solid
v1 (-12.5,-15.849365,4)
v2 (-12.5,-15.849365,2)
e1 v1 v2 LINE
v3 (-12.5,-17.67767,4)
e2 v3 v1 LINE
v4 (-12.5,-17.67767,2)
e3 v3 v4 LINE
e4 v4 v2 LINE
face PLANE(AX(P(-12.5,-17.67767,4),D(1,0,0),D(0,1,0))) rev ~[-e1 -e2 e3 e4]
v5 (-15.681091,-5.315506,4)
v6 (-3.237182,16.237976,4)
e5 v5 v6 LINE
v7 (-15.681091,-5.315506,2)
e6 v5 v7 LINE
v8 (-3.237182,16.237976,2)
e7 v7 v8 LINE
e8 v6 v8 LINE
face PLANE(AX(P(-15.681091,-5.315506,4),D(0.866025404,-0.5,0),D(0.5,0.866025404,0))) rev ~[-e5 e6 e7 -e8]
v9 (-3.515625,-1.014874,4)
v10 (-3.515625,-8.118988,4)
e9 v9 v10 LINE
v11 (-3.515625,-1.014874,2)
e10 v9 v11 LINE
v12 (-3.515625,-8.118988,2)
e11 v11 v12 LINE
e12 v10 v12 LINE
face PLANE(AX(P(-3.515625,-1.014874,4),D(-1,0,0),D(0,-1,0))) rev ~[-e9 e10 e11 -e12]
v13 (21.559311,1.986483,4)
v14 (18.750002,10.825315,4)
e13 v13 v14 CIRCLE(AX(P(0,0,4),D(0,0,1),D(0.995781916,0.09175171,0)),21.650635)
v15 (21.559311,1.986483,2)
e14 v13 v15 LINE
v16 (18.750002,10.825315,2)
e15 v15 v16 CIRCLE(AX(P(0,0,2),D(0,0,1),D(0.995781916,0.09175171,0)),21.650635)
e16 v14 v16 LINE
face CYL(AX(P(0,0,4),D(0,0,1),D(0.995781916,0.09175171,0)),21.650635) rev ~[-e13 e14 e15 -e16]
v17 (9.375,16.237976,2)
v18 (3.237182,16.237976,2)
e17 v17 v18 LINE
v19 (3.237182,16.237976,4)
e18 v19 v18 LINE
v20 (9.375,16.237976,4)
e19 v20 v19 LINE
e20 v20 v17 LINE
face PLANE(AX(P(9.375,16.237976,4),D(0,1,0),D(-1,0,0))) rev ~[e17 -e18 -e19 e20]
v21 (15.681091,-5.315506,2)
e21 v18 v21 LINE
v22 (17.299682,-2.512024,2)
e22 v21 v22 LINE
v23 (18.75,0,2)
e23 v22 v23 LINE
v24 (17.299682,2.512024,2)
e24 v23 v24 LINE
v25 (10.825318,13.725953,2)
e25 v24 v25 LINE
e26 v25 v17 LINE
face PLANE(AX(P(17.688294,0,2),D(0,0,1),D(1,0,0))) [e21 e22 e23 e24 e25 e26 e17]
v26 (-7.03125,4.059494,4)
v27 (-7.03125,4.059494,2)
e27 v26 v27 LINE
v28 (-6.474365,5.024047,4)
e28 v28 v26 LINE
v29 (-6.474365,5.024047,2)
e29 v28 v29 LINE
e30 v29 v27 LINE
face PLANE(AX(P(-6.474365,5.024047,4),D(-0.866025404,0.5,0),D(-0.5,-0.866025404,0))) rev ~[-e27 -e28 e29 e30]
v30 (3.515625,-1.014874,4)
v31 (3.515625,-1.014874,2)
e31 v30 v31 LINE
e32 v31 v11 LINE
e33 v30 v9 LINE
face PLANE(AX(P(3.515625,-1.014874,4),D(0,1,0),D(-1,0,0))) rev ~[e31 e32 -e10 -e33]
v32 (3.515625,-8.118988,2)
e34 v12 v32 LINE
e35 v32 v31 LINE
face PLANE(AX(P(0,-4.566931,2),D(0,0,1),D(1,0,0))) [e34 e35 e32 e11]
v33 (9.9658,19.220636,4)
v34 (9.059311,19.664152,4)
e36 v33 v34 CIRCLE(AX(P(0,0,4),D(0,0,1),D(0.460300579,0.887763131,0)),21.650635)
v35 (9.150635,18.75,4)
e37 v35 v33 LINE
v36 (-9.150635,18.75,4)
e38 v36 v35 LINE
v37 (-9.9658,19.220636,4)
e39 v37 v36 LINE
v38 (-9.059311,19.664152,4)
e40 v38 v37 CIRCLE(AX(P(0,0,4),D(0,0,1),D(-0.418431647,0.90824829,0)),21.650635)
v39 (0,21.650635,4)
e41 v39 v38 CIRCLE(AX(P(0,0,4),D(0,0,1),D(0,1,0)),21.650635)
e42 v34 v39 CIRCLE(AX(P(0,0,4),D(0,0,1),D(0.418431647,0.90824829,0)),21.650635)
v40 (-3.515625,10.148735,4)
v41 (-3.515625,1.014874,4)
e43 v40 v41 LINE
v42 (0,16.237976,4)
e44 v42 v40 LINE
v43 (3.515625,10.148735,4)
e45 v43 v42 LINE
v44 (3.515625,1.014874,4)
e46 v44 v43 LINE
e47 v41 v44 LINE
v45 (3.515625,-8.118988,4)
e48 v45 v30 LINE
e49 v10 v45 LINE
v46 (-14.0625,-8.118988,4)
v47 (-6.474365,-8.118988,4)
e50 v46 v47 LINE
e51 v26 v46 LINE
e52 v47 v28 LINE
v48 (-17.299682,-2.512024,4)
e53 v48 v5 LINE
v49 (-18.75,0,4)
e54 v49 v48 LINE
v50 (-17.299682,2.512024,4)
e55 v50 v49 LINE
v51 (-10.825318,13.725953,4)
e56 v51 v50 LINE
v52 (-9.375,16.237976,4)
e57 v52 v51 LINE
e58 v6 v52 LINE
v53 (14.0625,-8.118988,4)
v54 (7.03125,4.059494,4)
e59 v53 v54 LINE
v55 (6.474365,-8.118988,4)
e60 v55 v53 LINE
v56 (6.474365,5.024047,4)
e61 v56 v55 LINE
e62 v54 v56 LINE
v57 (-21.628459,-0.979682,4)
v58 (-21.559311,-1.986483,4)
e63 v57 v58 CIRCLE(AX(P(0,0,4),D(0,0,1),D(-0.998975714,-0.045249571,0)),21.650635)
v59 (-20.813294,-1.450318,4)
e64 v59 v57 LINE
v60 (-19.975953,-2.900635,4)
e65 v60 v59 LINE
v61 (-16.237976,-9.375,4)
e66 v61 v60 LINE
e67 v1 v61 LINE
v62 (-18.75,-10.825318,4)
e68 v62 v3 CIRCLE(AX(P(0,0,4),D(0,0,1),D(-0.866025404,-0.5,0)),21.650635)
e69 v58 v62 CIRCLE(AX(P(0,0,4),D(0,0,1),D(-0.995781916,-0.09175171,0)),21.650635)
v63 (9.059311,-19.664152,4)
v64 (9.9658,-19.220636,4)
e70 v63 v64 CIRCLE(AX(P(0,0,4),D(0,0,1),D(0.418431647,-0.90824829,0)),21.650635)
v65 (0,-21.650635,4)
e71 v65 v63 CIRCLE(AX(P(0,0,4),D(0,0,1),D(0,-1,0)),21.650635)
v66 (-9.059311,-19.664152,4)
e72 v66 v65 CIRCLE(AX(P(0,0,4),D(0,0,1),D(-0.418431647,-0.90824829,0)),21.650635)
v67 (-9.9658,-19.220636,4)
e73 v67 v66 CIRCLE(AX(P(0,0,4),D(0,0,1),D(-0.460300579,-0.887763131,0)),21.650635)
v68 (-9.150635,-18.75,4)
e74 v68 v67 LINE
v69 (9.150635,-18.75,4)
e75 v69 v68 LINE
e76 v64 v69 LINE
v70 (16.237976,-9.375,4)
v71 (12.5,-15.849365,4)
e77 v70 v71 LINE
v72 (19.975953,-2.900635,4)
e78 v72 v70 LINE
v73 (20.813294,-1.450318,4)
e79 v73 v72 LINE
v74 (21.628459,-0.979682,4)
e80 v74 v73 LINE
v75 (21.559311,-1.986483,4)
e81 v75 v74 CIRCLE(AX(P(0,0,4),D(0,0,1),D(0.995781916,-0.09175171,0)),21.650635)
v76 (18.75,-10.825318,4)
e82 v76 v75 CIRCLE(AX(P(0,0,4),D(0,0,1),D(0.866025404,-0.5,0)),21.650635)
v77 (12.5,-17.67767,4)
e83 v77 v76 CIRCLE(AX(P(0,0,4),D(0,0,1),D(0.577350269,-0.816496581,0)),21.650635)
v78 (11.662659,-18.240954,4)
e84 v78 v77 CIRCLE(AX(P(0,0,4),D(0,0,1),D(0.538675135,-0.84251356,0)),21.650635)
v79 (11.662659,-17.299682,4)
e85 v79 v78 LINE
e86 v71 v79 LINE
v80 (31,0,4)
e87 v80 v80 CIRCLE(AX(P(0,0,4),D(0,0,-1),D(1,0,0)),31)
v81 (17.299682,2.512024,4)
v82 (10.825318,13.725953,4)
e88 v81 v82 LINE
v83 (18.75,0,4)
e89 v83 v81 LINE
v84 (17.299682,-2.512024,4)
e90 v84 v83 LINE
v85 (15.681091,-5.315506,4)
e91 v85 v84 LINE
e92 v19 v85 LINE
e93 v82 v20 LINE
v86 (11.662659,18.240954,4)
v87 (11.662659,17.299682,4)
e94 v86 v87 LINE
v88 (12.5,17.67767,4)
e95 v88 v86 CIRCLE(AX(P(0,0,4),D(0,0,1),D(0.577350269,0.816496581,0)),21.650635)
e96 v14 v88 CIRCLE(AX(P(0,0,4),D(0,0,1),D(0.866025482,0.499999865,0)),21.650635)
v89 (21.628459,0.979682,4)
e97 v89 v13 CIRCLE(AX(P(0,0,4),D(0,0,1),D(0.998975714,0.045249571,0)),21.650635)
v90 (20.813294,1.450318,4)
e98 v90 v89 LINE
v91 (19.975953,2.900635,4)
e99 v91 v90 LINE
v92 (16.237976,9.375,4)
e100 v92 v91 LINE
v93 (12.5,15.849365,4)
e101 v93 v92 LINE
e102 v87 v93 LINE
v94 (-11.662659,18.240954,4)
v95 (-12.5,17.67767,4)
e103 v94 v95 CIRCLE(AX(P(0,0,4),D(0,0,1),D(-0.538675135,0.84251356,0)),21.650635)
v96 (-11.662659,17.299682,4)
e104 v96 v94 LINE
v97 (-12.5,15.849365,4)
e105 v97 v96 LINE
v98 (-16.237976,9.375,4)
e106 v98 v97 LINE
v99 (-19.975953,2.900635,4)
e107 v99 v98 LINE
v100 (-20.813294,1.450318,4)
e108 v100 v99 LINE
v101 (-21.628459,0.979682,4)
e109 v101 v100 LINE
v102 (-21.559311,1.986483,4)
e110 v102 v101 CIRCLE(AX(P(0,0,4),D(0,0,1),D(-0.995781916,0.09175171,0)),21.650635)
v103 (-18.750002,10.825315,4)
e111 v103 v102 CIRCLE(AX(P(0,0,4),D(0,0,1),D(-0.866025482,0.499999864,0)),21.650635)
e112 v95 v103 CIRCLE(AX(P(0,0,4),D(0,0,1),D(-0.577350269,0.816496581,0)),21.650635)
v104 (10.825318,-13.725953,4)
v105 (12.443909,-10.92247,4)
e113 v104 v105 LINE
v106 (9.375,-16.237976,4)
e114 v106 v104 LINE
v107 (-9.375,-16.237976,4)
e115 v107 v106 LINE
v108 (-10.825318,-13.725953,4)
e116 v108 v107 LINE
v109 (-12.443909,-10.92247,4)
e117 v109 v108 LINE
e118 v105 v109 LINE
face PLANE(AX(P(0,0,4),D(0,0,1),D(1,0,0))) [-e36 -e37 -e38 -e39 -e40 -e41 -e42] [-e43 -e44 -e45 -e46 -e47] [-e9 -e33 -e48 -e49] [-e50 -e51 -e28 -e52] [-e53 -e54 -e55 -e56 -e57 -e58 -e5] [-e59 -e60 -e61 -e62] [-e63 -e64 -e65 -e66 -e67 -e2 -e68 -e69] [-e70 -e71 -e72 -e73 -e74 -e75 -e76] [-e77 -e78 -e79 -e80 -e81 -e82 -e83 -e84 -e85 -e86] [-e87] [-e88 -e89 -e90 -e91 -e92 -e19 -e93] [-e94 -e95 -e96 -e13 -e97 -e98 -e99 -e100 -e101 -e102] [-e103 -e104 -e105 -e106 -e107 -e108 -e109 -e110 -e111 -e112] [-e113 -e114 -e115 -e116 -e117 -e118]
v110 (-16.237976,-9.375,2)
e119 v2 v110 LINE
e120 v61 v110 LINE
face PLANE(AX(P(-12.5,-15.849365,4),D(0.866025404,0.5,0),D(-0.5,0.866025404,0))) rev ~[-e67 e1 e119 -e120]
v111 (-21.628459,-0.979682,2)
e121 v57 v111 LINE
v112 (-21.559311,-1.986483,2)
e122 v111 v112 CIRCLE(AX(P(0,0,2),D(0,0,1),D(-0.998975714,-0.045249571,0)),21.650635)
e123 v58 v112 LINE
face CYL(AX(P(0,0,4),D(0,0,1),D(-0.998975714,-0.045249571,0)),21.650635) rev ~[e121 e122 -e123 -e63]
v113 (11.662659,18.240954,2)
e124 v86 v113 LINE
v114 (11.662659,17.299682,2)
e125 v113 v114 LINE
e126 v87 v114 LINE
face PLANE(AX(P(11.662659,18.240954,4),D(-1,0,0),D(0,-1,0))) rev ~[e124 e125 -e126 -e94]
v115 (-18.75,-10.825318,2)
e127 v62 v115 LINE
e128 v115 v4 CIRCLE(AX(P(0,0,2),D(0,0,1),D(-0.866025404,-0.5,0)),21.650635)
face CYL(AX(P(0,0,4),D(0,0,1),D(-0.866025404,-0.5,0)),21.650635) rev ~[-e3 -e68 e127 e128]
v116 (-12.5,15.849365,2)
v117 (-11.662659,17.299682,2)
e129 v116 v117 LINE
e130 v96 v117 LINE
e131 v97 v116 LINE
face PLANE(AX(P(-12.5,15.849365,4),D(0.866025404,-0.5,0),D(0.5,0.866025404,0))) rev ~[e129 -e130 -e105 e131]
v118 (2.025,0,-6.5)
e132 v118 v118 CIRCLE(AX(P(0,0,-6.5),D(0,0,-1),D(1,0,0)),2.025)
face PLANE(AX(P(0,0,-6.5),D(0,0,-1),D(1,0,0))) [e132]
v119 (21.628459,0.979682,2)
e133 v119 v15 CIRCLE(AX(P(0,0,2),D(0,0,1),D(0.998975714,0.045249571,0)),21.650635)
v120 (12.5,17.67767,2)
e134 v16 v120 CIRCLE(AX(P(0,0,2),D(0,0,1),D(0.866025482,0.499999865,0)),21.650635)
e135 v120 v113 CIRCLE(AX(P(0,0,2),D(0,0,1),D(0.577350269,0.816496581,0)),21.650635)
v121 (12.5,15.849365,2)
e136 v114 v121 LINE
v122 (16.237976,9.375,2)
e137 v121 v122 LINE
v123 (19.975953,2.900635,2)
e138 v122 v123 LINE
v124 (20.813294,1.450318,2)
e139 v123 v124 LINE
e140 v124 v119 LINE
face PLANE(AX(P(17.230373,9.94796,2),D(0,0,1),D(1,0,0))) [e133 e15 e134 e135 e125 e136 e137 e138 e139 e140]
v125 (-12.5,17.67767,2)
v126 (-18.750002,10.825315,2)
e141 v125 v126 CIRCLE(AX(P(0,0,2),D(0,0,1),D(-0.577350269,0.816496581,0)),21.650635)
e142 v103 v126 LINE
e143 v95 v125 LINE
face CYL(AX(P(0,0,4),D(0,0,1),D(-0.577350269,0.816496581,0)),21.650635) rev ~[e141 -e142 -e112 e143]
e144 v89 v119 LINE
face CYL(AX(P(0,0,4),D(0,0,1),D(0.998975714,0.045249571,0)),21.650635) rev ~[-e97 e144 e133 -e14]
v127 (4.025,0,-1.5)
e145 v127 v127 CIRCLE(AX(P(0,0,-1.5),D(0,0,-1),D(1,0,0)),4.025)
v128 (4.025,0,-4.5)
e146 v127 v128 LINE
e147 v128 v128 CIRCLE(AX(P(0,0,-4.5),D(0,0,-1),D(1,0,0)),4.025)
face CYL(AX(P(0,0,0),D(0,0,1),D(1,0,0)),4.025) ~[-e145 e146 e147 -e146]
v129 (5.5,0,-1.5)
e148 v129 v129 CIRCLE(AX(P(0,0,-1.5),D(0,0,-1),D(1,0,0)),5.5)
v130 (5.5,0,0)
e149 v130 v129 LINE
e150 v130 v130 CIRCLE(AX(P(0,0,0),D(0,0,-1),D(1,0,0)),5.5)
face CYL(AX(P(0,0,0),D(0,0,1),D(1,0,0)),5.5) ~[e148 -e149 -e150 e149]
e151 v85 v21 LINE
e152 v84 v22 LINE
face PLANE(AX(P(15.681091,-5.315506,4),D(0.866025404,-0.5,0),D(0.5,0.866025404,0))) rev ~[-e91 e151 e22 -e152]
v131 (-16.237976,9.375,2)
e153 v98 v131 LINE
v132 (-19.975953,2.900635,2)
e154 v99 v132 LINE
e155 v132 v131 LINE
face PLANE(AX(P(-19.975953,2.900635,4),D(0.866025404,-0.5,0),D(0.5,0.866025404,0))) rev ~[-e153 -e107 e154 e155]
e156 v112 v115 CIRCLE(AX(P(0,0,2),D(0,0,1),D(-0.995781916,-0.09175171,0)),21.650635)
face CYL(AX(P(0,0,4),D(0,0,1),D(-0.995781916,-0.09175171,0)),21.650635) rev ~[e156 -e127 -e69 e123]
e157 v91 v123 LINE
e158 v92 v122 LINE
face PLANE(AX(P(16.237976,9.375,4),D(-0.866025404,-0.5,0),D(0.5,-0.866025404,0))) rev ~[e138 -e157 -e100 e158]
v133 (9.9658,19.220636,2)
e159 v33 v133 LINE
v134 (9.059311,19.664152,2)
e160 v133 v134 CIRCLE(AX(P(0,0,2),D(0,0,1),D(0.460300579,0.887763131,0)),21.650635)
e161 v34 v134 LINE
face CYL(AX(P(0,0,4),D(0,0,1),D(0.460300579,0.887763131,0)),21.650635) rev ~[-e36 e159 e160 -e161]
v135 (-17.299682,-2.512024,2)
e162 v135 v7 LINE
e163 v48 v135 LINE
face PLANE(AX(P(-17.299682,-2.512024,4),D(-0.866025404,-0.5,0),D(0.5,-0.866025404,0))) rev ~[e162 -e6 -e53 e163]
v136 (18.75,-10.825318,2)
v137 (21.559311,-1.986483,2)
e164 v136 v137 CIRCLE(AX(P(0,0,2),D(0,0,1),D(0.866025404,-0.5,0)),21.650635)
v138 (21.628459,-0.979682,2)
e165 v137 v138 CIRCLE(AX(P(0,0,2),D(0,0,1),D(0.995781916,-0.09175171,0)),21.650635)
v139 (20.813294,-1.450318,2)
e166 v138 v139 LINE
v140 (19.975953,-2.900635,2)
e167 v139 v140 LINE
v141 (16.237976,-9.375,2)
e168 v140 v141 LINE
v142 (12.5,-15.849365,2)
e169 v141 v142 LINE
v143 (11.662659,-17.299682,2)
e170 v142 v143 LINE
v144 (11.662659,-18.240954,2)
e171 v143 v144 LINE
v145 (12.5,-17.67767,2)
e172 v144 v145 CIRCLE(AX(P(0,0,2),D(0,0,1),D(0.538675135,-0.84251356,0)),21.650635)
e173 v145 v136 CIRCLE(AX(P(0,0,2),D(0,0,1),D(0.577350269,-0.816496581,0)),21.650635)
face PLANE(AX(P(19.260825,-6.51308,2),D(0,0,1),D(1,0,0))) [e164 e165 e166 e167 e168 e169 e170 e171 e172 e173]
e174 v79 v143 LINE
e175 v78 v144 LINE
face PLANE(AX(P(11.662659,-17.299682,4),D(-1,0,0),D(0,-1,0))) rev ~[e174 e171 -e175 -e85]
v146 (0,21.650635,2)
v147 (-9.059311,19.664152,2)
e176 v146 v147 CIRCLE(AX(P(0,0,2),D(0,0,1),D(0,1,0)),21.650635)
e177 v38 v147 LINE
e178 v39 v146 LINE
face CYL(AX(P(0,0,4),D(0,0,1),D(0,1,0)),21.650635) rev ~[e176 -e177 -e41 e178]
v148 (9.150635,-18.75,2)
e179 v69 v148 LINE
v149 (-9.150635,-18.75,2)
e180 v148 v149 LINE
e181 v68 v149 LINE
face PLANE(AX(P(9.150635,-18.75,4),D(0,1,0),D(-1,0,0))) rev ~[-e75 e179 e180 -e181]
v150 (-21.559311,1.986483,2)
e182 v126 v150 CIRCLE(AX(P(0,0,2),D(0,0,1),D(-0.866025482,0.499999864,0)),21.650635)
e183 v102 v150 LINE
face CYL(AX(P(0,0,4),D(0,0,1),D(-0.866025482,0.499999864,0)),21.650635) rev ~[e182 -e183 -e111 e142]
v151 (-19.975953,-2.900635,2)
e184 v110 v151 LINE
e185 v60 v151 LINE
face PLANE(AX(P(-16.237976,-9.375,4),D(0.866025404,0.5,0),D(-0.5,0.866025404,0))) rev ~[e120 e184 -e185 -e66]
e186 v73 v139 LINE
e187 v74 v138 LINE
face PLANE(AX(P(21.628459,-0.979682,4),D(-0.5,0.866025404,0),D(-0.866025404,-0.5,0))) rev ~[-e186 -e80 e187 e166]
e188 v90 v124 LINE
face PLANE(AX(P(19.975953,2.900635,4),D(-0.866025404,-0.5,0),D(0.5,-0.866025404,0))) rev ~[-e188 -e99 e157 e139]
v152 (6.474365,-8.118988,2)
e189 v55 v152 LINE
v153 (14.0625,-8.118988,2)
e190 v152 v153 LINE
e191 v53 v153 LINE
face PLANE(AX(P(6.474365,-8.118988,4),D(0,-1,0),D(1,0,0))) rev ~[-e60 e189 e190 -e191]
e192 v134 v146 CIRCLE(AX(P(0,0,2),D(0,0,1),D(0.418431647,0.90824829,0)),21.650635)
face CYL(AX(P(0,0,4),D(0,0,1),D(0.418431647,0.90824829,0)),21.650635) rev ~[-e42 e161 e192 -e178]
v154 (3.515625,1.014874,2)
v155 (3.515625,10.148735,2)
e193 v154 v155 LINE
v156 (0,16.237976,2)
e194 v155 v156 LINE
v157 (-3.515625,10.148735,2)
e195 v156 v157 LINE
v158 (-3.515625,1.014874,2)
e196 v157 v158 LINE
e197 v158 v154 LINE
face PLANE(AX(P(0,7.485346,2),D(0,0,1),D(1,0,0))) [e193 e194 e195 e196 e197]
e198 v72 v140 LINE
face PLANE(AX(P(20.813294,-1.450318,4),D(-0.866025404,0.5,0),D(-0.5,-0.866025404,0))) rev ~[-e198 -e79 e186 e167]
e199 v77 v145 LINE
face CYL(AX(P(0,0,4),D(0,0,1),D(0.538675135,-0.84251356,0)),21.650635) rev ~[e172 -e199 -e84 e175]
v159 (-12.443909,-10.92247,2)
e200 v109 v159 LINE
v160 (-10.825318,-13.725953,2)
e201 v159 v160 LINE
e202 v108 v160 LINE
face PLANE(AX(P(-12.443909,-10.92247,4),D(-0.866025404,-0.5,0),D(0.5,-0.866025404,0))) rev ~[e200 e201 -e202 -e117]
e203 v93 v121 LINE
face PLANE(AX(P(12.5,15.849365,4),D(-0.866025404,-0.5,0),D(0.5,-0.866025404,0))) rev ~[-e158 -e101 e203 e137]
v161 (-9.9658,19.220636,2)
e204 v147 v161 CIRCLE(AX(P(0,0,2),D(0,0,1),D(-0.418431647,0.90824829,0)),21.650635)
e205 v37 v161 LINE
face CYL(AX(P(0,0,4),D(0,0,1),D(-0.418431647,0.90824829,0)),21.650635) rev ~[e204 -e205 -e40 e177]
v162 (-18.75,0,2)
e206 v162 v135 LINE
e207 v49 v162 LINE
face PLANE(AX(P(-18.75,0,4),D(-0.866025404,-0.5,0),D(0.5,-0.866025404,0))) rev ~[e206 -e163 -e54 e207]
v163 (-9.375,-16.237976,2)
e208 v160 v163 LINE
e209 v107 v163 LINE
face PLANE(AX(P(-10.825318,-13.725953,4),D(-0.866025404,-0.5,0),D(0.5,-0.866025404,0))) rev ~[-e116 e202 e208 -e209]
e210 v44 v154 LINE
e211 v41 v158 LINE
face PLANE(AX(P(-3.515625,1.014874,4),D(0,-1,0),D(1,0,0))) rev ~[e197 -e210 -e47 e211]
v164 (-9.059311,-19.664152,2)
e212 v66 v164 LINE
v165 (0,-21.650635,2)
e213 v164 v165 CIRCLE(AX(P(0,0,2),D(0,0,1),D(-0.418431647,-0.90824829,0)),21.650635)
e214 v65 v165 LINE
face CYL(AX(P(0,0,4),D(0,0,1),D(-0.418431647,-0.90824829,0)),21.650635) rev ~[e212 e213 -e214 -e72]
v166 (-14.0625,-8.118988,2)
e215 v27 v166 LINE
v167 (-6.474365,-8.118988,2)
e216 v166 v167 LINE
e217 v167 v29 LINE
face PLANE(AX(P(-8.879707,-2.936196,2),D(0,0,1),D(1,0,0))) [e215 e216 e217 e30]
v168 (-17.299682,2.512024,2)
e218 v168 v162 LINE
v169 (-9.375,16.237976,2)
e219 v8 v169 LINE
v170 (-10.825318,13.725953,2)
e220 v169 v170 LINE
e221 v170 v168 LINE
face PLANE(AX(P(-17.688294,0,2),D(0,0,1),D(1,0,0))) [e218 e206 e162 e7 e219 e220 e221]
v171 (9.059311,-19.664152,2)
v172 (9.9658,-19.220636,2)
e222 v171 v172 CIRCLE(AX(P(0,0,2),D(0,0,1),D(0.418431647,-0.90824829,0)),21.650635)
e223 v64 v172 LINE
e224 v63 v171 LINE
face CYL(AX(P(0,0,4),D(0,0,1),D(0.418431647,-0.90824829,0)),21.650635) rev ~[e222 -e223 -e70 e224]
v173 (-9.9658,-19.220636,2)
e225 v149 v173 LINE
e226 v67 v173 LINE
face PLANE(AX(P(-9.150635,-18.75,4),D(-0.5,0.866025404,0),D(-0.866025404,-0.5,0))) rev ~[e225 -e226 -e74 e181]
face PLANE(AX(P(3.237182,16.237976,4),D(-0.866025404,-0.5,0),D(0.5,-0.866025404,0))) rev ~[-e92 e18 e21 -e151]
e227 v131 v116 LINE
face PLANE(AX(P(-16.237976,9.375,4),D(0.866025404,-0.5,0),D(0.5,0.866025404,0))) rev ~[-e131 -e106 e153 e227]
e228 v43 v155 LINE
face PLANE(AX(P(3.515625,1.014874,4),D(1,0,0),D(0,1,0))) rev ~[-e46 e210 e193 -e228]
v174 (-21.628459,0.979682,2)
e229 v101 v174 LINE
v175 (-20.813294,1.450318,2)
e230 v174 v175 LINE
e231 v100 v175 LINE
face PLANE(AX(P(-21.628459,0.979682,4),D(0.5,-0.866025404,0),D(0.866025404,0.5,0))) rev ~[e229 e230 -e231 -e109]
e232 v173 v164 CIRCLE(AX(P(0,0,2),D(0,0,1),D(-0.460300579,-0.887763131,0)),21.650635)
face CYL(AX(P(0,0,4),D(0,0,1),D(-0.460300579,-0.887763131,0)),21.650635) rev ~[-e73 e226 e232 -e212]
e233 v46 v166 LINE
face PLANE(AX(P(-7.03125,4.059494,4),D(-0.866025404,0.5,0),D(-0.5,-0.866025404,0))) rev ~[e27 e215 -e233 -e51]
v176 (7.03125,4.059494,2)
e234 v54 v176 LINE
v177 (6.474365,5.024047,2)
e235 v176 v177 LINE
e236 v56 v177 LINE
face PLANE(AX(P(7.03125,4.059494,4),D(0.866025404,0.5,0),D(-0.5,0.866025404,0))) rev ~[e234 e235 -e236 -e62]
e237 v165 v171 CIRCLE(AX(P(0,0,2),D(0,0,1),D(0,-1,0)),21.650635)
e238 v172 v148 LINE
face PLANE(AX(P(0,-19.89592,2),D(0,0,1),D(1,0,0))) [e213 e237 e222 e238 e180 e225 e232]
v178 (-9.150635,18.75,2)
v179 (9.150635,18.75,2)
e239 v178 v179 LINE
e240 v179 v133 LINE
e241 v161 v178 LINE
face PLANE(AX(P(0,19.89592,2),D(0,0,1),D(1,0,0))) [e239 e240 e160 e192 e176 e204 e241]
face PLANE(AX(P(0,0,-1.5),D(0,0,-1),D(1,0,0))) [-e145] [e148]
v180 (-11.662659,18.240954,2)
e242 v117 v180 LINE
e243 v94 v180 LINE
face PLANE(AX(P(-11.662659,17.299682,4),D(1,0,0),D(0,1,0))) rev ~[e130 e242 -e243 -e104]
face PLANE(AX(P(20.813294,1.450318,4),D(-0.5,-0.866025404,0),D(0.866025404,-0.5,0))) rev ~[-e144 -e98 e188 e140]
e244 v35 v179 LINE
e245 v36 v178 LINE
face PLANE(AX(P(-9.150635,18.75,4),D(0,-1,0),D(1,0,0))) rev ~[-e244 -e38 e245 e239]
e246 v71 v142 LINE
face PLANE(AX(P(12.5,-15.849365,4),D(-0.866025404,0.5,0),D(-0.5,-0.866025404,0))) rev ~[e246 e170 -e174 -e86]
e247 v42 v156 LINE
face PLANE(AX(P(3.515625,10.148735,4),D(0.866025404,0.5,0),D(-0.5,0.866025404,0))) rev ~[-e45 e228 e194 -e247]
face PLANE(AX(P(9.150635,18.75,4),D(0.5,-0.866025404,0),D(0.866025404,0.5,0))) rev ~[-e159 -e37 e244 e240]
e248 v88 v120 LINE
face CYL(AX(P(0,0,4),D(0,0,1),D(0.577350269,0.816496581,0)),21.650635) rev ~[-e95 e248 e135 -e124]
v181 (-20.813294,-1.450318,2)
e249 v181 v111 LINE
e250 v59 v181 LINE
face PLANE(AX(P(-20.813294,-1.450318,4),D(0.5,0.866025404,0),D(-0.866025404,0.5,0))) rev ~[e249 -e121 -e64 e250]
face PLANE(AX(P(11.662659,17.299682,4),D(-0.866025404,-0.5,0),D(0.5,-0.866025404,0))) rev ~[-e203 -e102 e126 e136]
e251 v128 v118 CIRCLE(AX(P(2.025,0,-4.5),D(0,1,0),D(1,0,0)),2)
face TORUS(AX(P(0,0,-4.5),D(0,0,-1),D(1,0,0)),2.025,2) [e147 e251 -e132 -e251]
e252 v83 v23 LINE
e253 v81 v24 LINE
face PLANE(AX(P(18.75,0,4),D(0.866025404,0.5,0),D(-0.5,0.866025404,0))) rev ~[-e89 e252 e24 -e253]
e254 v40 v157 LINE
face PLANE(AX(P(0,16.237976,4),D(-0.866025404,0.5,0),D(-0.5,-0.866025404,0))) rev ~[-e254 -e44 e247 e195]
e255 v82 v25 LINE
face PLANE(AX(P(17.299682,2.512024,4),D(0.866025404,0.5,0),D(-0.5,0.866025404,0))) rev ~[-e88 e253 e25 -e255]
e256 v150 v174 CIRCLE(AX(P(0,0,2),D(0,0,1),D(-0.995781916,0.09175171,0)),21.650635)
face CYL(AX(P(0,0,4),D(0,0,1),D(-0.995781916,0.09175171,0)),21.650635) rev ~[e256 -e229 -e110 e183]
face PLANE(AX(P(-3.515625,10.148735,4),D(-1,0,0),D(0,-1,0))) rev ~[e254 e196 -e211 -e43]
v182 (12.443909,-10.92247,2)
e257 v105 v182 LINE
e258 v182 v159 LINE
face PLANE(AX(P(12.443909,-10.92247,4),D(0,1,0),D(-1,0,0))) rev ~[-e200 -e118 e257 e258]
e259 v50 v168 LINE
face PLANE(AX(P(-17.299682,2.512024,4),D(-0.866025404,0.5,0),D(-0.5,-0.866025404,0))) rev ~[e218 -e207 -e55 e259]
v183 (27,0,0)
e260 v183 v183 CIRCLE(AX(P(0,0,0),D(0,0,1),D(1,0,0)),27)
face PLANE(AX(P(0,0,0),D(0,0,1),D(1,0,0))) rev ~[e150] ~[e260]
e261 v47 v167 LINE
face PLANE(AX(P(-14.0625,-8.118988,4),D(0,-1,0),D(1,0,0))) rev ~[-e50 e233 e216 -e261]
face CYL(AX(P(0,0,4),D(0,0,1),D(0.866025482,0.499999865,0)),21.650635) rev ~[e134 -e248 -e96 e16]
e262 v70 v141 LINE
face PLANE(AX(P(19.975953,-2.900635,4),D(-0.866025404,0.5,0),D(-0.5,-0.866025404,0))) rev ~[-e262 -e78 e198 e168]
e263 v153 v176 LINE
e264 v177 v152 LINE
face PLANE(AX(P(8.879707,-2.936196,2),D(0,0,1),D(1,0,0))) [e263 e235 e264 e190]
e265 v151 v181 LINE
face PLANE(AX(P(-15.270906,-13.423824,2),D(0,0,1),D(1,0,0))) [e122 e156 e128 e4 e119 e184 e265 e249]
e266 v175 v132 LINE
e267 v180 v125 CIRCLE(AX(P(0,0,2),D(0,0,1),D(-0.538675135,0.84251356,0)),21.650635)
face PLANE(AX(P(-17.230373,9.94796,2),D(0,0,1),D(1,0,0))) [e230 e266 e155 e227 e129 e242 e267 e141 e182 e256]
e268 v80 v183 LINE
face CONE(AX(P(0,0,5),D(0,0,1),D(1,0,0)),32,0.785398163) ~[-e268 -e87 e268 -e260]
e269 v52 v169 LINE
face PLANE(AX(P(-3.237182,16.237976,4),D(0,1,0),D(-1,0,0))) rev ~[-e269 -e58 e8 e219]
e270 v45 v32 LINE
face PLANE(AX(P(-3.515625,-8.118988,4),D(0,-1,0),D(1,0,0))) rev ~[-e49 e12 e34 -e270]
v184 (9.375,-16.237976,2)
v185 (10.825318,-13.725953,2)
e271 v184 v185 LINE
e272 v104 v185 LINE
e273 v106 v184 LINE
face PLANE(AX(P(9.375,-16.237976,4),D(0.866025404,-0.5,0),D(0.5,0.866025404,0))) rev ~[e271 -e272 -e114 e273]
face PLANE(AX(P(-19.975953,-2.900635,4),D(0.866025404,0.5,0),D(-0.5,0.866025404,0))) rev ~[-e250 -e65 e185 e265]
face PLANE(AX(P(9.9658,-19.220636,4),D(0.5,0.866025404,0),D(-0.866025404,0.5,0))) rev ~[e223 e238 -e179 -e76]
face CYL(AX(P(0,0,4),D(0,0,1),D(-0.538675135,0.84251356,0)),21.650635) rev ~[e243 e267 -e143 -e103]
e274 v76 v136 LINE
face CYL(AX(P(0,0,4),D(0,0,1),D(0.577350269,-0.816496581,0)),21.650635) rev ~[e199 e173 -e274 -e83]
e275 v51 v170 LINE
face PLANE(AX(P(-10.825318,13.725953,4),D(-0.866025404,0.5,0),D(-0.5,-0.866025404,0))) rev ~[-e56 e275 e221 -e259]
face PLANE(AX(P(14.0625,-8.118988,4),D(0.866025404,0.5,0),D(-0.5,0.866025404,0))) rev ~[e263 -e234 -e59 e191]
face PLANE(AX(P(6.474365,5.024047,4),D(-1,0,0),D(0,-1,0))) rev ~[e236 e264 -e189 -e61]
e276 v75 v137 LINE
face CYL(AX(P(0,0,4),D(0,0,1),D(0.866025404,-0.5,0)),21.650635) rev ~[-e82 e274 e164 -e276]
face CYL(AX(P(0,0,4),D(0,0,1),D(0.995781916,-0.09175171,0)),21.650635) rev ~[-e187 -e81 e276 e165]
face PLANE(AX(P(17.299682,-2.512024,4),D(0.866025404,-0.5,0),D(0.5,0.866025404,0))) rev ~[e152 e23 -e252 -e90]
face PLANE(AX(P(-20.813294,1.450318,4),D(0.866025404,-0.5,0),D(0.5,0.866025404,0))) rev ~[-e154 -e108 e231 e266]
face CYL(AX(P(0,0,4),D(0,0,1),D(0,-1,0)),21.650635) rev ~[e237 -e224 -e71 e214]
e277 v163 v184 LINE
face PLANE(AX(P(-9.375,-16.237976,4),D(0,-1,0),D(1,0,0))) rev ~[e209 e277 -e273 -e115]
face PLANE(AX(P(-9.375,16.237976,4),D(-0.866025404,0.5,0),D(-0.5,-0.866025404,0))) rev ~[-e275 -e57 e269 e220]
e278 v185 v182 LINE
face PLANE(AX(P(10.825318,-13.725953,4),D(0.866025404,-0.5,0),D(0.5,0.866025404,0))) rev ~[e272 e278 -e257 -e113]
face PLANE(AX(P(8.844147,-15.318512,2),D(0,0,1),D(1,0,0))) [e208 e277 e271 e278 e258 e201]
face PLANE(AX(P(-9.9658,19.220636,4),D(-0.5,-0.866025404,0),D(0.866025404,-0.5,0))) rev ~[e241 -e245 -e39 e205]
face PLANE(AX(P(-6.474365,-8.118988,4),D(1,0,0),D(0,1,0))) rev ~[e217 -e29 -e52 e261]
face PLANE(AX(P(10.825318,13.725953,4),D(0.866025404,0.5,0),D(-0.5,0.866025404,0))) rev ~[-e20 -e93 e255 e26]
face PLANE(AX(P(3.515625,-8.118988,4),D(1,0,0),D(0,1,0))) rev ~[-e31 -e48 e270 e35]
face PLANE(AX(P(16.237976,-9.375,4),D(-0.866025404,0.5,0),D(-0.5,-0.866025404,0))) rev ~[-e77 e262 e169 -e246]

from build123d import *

# Parameters (mm, degrees)
F0_R     = 32
F1_DEPTH = 4
F3_R     = 5.5
F3_R_2   = 4.025
F4_DEPTH = 1.5
F5_DEPTH = 6.5
F7_DEPTH = 2
F8_R     = 2


# Not quite as in the source:
# - a fillet or chamfer that OpenCascade refuses, or shapes differently, is made with other operations: its cross-section is extruded or revolved along the edge and cut away or added


with BuildPart() as f1:
    # F0 (on Top) → F1 (new body)
    with BuildSketch(Plane.XY):
        Circle(F0_R)
    extrude(amount=F1_DEPTH)

    # F2: chamfer of 5 on 1 edges, made by hand

    # F2_s1 → F2_t2 (revolve, cut)
    with BuildSketch(Plane.XZ):
        Polygon((32, 5), (27, 0), (32, 0), align=None)
    revolve(axis=Axis((0, 0, 0), (0, 0, 1)), mode=Mode.SUBTRACT)

    # F3 (on face) → F4 (join)
    with BuildSketch(Plane(origin=(0, 0, 0), x_dir=(1, 0, 0), z_dir=(0, 0, -1))):
        Circle(F3_R)
        Circle(F3_R_2, mode=Mode.SUBTRACT)
    extrude(amount=F4_DEPTH)

    # F3 (on face) → F5 (join)
    with BuildSketch(Plane(origin=(0, 0, 0), x_dir=(1, 0, 0), z_dir=(0, 0, -1))):
        Circle(F3_R_2)
    extrude(amount=F5_DEPTH)

    # F6 (on face) → F7 (cut)
    with BuildSketch(Plane.XY.offset(4)):
        with BuildLine():
            Line((16.237976321, -9.375), (18.75, -10.8253175473))
            ThreePointArc((18.75, -10.8253175473), (20.6335015486, -6.5580952909), (21.5593108924, -1.9864827825))
            Line((21.5593108924, -1.9864827825), (19.9759526419, -2.9006350946))
            Line((19.9759526419, -2.9006350946), (16.237976321, -9.375))
        make_face()
        with BuildLine():
            ThreePointArc((12.5, -17.6776695297), (15.9962278967, -14.5900888646), (18.75, -10.8253175473))
            Line((18.75, -10.8253175473), (16.237976321, -9.375))
            Line((16.237976321, -9.375), (12.5, -15.8493649054))
            Line((12.5, -15.8493649054), (12.5, -17.6776695297))
        make_face()
        with BuildLine():
            ThreePointArc((21.5593108924, 1.9864827825), (20.6335020609, 6.5580936791), (18.7500016913, 10.8253146179))
            ThreePointArc((18.7500016913, 10.8253146179), (15.9962290364, 14.590087615), (12.5, 17.6776695297))
            Line((12.5, 17.6776695297), (12.5, 15.8493649054))
            Line((12.5, 15.8493649054), (16.2379763781, 9.3749999011))
            Line((16.2379763781, 9.3749999011), (19.9759526419, 2.9006350946))
            Line((19.9759526419, 2.9006350946), (21.5593108924, 1.9864827825))
        make_face()
        with BuildLine():
            ThreePointArc((9.0593108924, 19.6641523121), (4.6372736512, 21.1481841557), (-1.3e-09, 21.6506350946))
            ThreePointArc((-1.3e-09, 21.6506350946), (-4.6372736525, 21.1481841554), (-9.0593108924, 19.6641523121))
            Line((-9.0593108924, 19.6641523121), (-7.4759526419, 18.75))
            Line((-7.4759526419, 18.75), (-3.65e-08, 18.75))
            Line((-3.65e-08, 18.75), (7.4759526419, 18.75))
            Line((7.4759526419, 18.75), (9.0593108924, 19.6641523121))
        make_face()
        with BuildLine():
            ThreePointArc((-9.0593108924, -19.6641523121), (-4.6372736547, -21.1481841549), (-5.7e-09, -21.6506350946))
            ThreePointArc((-5.7e-09, -21.6506350946), (4.6372736491, -21.1481841562), (9.0593108924, -19.6641523121))
            Line((9.0593108924, -19.6641523121), (7.4759526419, -18.75))
            Line((7.4759526419, -18.75), (0, -18.75))
            Line((0, -18.75), (-7.4759526419, -18.75))
            Line((-7.4759526419, -18.75), (-9.0593108924, -19.6641523121))
        make_face()
        with BuildLine():
            ThreePointArc((11.6626587737, -18.2409536573), (12.0846117855, -17.9641909919), (12.5, -17.6776695297))
            Line((12.5, -17.6776695297), (12.5, -15.8493649054))
            Line((12.5, -15.8493649054), (11.6626587737, -17.2996824527))
            Line((11.6626587737, -17.2996824527), (11.6626587737, -18.2409536573))
        make_face()
        with BuildLine():
            Line((19.9759526419, -2.9006350946), (21.5593108924, -1.9864827825))
            ThreePointArc((21.5593108924, -1.9864827825), (21.5997516502, -1.4834853051), (21.6284586433, -0.979681945))
            Line((21.6284586433, -0.979681945), (20.8132938683, -1.4503175473))
            Line((20.8132938683, -1.4503175473), (19.9759526419, -2.9006350946))
        make_face()
        with BuildLine():
            ThreePointArc((21.6284586433, 0.979681945), (21.5997516502, 1.4834853051), (21.5593108924, 1.9864827825))
            Line((21.5593108924, 1.9864827825), (19.9759526419, 2.9006350946))
            Line((19.9759526419, 2.9006350946), (20.8132938683, 1.4503175473))
            Line((20.8132938683, 1.4503175473), (21.6284586433, 0.979681945))
        make_face()
        with BuildLine():
            Line((12.5, 15.8493649054), (12.5, 17.6776695297))
            ThreePointArc((12.5, 17.6776695297), (12.0846117855, 17.9641909919), (11.6626587737, 18.2409536573))
            Line((11.6626587737, 18.2409536573), (11.6626587737, 17.2996824527))
            Line((11.6626587737, 17.2996824527), (12.5, 15.8493649054))
        make_face()
        with BuildLine():
            ThreePointArc((-12.5, 17.6776695297), (-15.9962290427, 14.5900876082), (-18.7500017006, 10.8253146018))
            ThreePointArc((-18.7500017006, 10.8253146018), (-20.6335020637, 6.5580936703), (-21.5593108924, 1.9864827825))
            Line((-21.5593108924, 1.9864827825), (-19.9759526419, 2.9006350946))
            Line((-19.9759526419, 2.9006350946), (-16.2379762959, 9.3750000433))
            Line((-16.2379762959, 9.3750000433), (-12.5, 15.8493649054))
            Line((-12.5, 15.8493649054), (-12.5, 17.6776695297))
        make_face()
        with BuildLine():
            ThreePointArc((9.9657998697, 19.2206356023), (9.5151398647, 19.447676297), (9.0593108924, 19.6641523121))
            Line((9.0593108924, 19.6641523121), (7.4759526419, 18.75))
            Line((7.4759526419, 18.75), (9.1506350946, 18.75))
            Line((9.1506350946, 18.75), (9.9657998697, 19.2206356023))
        make_face()
        with BuildLine():
            Line((-7.4759526419, 18.75), (-9.0593108924, 19.6641523121))
            ThreePointArc((-9.0593108924, 19.6641523121), (-9.5151398647, 19.447676297), (-9.9657998697, 19.2206356023))
            Line((-9.9657998697, 19.2206356023), (-9.1506350946, 18.75))
            Line((-9.1506350946, 18.75), (-7.4759526419, 18.75))
        make_face()
        with BuildLine():
            Line((-16.237976321, -9.375), (-18.75, -10.8253175473))
            ThreePointArc((-18.75, -10.8253175473), (-15.9962278967, -14.5900888646), (-12.5, -17.6776695297))
            Line((-12.5, -17.6776695297), (-12.5, -15.8493649054))
            Line((-12.5, -15.8493649054), (-16.237976321, -9.375))
        make_face()
        with BuildLine():
            ThreePointArc((-21.5593108924, -1.9864827825), (-20.6335015486, -6.5580952909), (-18.75, -10.8253175473))
            Line((-18.75, -10.8253175473), (-16.237976321, -9.375))
            Line((-16.237976321, -9.375), (-19.9759526419, -2.9006350946))
            Line((-19.9759526419, -2.9006350946), (-21.5593108924, -1.9864827825))
        make_face()
        with BuildLine():
            ThreePointArc((-9.9657998697, -19.2206356023), (-9.5151398647, -19.447676297), (-9.0593108924, -19.6641523121))
            Line((-9.0593108924, -19.6641523121), (-7.4759526419, -18.75))
            Line((-7.4759526419, -18.75), (-9.1506350946, -18.75))
            Line((-9.1506350946, -18.75), (-9.9657998697, -19.2206356023))
        make_face()
        with BuildLine():
            Line((7.4759526419, -18.75), (9.0593108924, -19.6641523121))
            ThreePointArc((9.0593108924, -19.6641523121), (9.5151398647, -19.447676297), (9.9657998697, -19.2206356023))
            Line((9.9657998697, -19.2206356023), (9.1506350946, -18.75))
            Line((9.1506350946, -18.75), (7.4759526419, -18.75))
        make_face()
        Polygon((6.4743649054, -16.237976321), (9.375, -16.237976321), (10.8253175473, -13.7259526419), align=None)
        Polygon((17.2996824527, -2.512023679), (18.75, 0), (17.2996824527, 2.512023679), align=None)
        with BuildLine():
            ThreePointArc((-11.6626587737, 18.2409536573), (-12.0846117855, 17.9641909919), (-12.5, 17.6776695297))
            Line((-12.5, 17.6776695297), (-12.5, 15.8493649054))
            Line((-12.5, 15.8493649054), (-11.6626587737, 17.2996824527))
            Line((-11.6626587737, 17.2996824527), (-11.6626587737, 18.2409536573))
        make_face()
        with BuildLine():
            Line((-19.9759526419, 2.9006350946), (-21.5593108924, 1.9864827825))
            ThreePointArc((-21.5593108924, 1.9864827825), (-21.5997516502, 1.4834853051), (-21.6284586433, 0.979681945))
            Line((-21.6284586433, 0.979681945), (-20.8132938683, 1.4503175473))
            Line((-20.8132938683, 1.4503175473), (-19.9759526419, 2.9006350946))
        make_face()
        with BuildLine():
            ThreePointArc((-21.6284586433, -0.979681945), (-21.5997516502, -1.4834853051), (-21.5593108924, -1.9864827825))
            Line((-21.5593108924, -1.9864827825), (-19.9759526419, -2.9006350946))
            Line((-19.9759526419, -2.9006350946), (-20.8132938683, -1.4503175473))
            Line((-20.8132938683, -1.4503175473), (-21.6284586433, -0.979681945))
        make_face()
        Polygon((0, -16.237976321), (6.4743649054, -16.237976321), (10.8253175473, -13.7259526419), (12.4439087737, -10.9224704012), (-12.4439087737, -10.9224704012), (-10.8253175473, -13.7259526419), (-6.4743649054, -16.237976321), align=None)
        Polygon((15.6810912263, -5.3155059198), (17.2996824527, -2.512023679), (17.2996824527, 2.512023679), (10.8253175473, 13.7259526419), (6.4743649054, 16.237976321), (3.2371824527, 16.237976321), align=None)
        Polygon((-17.2996824527, 2.512023679), (-18.75, 0), (-17.2996824527, -2.512023679), align=None)
        Polygon((-10.8253175473, -13.7259526419), (-9.375, -16.237976321), (-6.4743649054, -16.237976321), align=None)
        Polygon((-7.03125, 4.0594940802), (-14.0625, -8.1189881605), (-6.4743649054, -8.1189881605), (-6.4743649054, 5.0240473581), align=None)
        Polygon((10.8253175473, 13.7259526419), (9.375, 16.237976321), (6.4743649054, 16.237976321), align=None)
        Polygon((-6.4743649054, 16.237976321), (-9.375, 16.237976321), (-10.8253175473, 13.7259526419), align=None)
        Polygon((-10.8253175473, 13.7259526419), (-17.2996824527, 2.512023679), (-17.2996824527, -2.512023679), (-15.6810912263, -5.3155059198), (-3.2371824527, 16.237976321), (-6.4743649054, 16.237976321), align=None)
        Polygon((6.4743649054, -8.1189881605), (14.0625, -8.1189881605), (7.03125, 4.0594940802), (6.4743649054, 5.0240473581), align=None)
        Polygon((-3.515625, -4.0594940802), (-3.515625, -8.1189881605), (3.515625, -8.1189881605), (3.515625, -1.0148735201), (0, -1.0148735201), (-3.515625, -1.0148735201), (-3.515625, -2.0297470401), align=None)
        Polygon((3.515625, 10.1487352006), (0, 16.237976321), (-3.515625, 10.1487352006), (-3.515625, 1.0148735201), (0, 1.0148735201), (3.515625, 1.0148735201), align=None)
    extrude(amount=-F7_DEPTH, mode=Mode.SUBTRACT)

    # F8
    f8_edges = [f1.edges().sort_by_distance(p)[0] for p in [
        (-4.025, 0, -6.5),
    ]]
    fillet(f8_edges, radius=F8_R)


solid = f1.part
